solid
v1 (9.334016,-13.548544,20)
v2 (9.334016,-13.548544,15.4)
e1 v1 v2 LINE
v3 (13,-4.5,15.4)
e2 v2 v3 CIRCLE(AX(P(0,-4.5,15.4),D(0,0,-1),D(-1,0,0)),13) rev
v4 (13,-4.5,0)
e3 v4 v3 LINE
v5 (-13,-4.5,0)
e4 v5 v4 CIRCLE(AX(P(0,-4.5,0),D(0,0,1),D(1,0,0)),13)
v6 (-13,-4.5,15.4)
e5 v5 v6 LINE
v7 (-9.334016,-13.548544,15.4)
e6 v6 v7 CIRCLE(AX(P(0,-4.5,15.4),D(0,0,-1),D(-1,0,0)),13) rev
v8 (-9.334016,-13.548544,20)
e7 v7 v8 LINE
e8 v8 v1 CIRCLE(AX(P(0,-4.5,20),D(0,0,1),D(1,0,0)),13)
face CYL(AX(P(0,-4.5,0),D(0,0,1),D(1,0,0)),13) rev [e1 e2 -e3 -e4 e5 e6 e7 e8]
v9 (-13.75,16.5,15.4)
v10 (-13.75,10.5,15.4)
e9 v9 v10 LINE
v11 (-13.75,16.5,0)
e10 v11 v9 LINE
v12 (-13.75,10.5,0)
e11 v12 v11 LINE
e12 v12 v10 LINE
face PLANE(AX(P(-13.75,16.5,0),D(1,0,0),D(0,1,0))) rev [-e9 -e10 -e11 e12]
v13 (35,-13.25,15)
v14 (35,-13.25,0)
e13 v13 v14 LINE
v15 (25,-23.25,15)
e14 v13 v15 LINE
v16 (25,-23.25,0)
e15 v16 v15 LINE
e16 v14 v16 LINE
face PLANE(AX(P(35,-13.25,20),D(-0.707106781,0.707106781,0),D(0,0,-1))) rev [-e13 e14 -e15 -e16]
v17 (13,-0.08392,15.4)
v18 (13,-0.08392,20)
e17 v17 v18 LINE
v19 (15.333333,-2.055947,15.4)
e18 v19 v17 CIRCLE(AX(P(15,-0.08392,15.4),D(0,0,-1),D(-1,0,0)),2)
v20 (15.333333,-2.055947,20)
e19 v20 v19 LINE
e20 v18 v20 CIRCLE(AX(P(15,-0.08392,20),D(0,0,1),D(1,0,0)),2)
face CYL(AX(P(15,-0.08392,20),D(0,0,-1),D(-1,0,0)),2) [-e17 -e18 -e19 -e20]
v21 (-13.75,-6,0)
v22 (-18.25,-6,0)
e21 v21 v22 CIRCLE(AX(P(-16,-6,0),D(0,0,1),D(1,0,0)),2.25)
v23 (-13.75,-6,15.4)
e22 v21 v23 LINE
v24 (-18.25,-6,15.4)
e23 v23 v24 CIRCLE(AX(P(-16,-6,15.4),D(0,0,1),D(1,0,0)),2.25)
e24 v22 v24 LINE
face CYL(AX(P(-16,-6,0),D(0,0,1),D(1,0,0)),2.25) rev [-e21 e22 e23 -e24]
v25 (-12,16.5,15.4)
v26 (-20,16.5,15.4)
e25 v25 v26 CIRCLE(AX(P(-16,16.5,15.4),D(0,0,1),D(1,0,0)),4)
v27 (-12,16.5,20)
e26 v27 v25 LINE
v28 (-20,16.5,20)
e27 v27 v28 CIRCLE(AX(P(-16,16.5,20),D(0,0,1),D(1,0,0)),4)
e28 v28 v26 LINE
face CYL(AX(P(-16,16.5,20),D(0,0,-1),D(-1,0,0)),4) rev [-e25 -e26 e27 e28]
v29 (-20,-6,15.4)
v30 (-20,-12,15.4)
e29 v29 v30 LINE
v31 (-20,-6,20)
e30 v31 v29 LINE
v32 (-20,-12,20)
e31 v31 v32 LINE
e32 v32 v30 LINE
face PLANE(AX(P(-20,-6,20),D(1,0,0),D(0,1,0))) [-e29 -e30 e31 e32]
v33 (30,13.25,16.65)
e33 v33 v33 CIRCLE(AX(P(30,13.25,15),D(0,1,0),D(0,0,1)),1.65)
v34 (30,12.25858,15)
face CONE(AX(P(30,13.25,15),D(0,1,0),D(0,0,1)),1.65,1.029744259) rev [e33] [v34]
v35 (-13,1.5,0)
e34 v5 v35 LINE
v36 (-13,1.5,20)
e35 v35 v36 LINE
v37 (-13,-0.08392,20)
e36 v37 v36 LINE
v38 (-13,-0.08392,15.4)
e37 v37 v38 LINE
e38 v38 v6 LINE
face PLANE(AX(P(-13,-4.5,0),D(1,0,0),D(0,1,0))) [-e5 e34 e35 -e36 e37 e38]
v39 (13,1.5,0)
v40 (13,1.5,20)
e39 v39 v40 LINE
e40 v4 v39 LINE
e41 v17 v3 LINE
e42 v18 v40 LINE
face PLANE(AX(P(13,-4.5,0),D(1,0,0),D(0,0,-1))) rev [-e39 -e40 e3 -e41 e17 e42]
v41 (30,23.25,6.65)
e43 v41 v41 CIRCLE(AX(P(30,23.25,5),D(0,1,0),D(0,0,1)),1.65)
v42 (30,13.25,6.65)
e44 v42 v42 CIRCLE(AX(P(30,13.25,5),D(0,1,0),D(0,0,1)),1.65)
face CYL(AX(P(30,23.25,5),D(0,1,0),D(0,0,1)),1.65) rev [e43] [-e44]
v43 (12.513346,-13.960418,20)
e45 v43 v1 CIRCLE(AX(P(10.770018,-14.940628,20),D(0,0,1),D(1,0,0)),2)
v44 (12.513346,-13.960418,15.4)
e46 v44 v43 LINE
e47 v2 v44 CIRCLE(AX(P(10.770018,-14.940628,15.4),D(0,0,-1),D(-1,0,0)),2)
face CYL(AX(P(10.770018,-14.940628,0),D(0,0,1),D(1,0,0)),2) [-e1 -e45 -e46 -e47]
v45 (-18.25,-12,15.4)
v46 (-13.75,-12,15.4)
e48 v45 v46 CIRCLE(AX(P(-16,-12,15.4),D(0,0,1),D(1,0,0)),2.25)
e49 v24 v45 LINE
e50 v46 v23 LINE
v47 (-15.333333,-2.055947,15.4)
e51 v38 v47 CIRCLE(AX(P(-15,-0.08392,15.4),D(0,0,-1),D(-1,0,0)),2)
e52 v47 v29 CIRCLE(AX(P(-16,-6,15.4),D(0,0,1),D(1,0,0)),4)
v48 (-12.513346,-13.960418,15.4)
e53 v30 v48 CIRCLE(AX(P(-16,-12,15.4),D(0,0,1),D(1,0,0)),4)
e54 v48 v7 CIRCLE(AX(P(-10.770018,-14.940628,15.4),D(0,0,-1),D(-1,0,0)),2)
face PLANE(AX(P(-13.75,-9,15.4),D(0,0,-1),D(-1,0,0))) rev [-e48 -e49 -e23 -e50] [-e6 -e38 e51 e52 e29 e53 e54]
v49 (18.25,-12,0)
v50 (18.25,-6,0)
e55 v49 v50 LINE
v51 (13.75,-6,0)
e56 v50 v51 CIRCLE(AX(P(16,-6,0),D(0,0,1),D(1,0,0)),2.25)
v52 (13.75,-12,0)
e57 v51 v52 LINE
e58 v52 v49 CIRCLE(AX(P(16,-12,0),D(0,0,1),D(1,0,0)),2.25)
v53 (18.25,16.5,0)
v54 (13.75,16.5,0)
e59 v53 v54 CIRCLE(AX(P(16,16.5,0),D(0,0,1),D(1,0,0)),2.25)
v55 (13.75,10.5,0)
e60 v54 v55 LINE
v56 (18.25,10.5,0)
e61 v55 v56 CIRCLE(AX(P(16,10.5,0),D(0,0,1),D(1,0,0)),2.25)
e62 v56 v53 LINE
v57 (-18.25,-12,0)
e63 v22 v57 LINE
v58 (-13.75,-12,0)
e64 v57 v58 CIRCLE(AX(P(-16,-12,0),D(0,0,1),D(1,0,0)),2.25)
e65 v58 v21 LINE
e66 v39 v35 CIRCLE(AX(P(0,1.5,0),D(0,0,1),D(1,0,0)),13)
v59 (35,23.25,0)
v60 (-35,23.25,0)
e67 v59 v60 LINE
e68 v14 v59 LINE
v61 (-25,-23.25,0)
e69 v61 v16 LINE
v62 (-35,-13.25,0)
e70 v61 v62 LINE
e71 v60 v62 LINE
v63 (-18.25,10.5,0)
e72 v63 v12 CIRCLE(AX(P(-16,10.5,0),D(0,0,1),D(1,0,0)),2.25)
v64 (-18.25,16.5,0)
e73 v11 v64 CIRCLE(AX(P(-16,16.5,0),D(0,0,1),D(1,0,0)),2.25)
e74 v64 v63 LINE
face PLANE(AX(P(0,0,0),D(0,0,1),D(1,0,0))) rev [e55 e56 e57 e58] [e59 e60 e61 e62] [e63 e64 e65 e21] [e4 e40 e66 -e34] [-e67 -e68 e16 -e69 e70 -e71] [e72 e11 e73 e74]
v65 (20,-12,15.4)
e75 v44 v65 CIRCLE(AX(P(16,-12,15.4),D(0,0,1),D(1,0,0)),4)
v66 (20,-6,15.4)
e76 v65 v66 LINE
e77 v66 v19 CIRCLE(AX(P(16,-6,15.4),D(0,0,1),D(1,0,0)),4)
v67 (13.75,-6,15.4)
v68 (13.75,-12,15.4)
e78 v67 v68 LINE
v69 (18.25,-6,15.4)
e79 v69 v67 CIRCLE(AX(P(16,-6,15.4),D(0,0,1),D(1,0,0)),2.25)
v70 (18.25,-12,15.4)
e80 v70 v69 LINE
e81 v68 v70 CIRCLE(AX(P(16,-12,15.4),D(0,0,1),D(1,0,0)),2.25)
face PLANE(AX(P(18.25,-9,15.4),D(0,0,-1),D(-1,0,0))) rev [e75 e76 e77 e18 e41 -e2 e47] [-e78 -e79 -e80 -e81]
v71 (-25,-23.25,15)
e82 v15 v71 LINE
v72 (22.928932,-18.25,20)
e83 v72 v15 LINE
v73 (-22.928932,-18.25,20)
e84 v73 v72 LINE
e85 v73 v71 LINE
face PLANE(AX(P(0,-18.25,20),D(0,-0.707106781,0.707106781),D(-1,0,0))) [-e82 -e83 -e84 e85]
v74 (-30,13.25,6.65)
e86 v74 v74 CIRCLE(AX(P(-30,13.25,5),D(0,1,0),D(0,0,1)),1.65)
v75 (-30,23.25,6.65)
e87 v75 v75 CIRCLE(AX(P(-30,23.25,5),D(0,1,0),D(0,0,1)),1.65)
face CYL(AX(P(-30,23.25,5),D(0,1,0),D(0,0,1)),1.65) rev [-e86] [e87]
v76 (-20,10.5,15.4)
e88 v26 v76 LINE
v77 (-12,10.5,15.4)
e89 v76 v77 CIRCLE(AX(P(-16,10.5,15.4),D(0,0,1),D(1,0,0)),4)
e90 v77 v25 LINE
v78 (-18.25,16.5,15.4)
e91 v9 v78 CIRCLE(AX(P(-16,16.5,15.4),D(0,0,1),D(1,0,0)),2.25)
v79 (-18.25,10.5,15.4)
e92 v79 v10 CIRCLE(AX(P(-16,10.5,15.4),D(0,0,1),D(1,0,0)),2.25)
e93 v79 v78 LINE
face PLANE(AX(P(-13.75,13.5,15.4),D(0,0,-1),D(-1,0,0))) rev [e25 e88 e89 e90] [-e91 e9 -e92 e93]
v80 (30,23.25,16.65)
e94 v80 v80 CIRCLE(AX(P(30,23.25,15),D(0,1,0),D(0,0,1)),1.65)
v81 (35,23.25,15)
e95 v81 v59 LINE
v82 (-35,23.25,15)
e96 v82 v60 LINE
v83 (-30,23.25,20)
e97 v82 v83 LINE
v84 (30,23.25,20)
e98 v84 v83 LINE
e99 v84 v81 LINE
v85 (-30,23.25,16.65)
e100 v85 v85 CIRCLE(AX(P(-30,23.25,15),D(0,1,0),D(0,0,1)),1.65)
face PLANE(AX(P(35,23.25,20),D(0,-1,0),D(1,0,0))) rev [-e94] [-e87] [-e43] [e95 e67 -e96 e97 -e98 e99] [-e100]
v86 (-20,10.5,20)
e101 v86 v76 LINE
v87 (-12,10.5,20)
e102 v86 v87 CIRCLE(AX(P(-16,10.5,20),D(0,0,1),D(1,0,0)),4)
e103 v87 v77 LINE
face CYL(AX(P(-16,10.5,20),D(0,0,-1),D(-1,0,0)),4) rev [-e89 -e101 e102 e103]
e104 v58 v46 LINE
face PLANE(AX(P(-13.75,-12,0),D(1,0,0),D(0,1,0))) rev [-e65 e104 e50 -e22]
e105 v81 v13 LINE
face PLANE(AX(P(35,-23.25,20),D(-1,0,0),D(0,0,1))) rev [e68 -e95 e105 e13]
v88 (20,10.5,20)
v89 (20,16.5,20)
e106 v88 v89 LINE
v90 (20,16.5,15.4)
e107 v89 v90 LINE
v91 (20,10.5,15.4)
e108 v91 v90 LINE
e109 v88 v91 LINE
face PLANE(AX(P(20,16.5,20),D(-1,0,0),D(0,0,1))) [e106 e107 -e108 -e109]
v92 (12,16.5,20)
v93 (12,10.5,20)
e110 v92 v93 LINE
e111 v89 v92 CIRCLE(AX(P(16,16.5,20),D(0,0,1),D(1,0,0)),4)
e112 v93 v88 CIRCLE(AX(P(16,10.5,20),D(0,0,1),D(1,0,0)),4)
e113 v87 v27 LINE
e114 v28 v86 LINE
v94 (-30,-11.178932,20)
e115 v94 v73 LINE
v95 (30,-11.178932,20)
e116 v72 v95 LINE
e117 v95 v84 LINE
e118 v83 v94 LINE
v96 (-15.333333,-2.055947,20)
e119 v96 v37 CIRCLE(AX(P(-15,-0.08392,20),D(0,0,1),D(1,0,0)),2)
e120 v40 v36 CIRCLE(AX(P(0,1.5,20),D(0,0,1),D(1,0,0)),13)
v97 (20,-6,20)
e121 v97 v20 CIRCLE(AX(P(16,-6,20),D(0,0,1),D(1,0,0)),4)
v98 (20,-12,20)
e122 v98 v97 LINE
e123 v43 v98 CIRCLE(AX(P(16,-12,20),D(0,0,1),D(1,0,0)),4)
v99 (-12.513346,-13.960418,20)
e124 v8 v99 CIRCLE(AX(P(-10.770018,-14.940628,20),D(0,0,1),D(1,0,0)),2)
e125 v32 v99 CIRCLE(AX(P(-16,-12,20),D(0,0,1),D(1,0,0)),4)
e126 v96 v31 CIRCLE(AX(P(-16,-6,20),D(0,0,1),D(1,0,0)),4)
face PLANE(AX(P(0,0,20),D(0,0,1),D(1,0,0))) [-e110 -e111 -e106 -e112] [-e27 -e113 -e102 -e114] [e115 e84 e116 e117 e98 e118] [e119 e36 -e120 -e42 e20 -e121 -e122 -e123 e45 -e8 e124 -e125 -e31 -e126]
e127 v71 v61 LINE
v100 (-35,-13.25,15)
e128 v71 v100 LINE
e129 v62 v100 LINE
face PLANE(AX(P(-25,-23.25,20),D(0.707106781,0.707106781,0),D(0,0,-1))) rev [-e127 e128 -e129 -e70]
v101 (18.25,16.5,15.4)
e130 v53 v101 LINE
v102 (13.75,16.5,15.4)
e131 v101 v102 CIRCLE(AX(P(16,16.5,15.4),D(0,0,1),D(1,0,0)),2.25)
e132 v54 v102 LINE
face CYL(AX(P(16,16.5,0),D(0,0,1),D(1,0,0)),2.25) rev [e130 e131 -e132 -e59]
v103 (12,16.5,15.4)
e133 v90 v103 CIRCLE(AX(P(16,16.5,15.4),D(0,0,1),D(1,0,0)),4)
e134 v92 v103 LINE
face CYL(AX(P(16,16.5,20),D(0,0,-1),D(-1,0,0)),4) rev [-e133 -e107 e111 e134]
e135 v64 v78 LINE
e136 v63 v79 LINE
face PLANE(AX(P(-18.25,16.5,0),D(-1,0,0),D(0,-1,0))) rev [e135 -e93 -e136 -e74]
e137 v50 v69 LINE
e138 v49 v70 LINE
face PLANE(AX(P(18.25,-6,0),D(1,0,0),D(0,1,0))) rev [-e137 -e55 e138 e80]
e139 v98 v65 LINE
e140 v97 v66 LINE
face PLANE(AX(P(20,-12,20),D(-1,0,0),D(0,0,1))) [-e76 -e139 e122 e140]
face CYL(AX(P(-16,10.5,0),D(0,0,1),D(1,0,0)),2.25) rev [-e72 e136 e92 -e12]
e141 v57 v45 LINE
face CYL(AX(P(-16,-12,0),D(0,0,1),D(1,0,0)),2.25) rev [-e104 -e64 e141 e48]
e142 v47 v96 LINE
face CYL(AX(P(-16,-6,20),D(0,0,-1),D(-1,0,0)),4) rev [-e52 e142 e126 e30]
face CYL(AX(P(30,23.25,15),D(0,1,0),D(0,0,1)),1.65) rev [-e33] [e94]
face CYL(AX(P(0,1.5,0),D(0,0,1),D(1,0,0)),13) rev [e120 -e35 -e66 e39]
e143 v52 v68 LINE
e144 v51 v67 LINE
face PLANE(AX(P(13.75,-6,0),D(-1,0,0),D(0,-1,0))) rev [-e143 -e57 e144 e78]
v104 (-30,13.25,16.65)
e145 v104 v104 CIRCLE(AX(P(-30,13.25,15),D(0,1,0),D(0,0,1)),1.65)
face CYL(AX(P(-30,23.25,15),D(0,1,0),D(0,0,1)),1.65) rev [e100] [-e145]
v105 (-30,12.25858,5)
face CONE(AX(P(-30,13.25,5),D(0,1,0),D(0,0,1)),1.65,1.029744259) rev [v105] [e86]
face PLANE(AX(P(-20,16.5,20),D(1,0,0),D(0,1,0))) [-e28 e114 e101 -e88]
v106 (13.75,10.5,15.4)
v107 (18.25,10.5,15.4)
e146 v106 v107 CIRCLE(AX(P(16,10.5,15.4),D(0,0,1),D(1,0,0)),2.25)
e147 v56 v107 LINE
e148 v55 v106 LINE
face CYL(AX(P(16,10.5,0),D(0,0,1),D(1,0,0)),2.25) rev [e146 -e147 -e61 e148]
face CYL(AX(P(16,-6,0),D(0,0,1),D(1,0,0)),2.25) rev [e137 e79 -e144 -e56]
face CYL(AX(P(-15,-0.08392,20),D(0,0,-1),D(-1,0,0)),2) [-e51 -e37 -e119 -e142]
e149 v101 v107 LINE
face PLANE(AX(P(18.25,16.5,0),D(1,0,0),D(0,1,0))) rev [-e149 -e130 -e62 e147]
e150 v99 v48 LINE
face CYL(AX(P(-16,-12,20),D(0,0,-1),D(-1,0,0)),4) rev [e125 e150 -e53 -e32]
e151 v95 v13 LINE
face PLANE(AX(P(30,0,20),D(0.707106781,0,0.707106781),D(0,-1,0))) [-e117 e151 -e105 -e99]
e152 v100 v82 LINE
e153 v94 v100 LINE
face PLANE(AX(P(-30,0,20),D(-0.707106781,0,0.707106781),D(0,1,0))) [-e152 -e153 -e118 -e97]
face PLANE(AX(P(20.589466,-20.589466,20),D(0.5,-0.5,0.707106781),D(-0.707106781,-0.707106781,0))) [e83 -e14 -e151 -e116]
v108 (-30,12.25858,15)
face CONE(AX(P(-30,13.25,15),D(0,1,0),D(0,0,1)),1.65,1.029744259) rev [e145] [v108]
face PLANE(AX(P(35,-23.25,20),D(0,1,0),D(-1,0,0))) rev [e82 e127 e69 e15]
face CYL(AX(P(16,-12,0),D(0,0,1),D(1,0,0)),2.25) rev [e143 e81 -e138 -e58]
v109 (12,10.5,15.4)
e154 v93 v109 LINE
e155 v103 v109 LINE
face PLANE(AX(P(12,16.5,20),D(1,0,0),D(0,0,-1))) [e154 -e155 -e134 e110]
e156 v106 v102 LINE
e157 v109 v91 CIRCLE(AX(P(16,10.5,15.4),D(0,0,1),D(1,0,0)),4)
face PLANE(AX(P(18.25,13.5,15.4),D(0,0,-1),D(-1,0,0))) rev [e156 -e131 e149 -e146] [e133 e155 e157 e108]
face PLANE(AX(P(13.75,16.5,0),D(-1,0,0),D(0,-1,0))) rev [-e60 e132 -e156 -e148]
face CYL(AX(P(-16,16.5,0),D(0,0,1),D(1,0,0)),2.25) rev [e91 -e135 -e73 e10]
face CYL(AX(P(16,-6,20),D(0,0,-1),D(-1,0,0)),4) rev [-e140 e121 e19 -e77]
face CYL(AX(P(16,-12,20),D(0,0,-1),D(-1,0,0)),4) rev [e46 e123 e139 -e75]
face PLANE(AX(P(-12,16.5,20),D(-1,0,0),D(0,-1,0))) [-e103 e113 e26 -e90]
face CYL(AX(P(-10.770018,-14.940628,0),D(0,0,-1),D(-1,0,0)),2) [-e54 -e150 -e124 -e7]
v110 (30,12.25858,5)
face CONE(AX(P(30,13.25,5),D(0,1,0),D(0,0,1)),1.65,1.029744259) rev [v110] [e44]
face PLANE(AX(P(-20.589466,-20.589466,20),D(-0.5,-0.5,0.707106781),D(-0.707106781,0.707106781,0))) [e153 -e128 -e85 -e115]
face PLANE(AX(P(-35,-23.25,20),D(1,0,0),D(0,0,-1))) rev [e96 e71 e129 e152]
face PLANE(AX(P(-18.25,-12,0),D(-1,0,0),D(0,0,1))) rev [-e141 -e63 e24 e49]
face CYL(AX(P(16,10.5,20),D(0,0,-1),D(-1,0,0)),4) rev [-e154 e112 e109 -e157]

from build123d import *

# Parameters (mm, degrees)
SKETCH1_W                                            = 70
SKETCH1_H                                            = 46.5
BOSS_EXTRUDE1_DEPTH                                  = 20
CUT_EXTRUDE1_DEPTH                                   = 47.535604648
CBORE_FOR_M4_HEXAGON_SOCKET_HEAD_CAP_SCR_D           = 4.5
CBORE_FOR_M4_HEXAGON_SOCKET_HEAD_CAP_SCR_CBORE_D     = 8
CBORE_FOR_M4_HEXAGON_SOCKET_HEAD_CAP_SCR_CBORE_DEPTH = 4.6
CUT_EXTRUDE2_DEPTH                                   = 45.751787674
CUT_EXTRUDE3_DEPTH                                   = 45.751787674
FILLET1_R                                            = 2
CHAMFER1_SIZE                                        = 10
M4_TAPPED_HOLE1_D                                    = 3.3
M4_TAPPED_HOLE1_DEPTH                                = 10
M4_TAPPED_HOLE1_TIP                                  = 0.991420021
CHAMFER2_SIZE                                        = 5


with BuildPart() as part:
    # Sketch1 → Boss-Extrude1 (new body)
    with BuildSketch(Plane.XY):
        Rectangle(SKETCH1_W, SKETCH1_H)
    extrude(amount=BOSS_EXTRUDE1_DEPTH)

    # Sketch2 → Cut-Extrude1 (cut, through all)
    with BuildSketch(Plane.XY.offset(20)):
        with BuildLine():
            Line((-13, -4.5), (-13, 1.5))
            ThreePointArc((-13, 1.5), (0, 14.5), (13, 1.5))
            Line((13, 1.5), (13, -4.5))
            ThreePointArc((13, -4.5), (0, -17.5), (-13, -4.5))
        make_face()
    extrude(amount=-CUT_EXTRUDE1_DEPTH, mode=Mode.SUBTRACT)

    # CBORE for M4 Hexagon socket head cap screws1 (through all)
    with Locations(Plane.XY.offset(20)):
        with Locations((-16, 13.5), (-16, -9), (16, -9), (16, 13.5), (0, -1.5)):
            CounterBoreHole(CBORE_FOR_M4_HEXAGON_SOCKET_HEAD_CAP_SCR_D / 2, CBORE_FOR_M4_HEXAGON_SOCKET_HEAD_CAP_SCR_CBORE_D / 2, CBORE_FOR_M4_HEXAGON_SOCKET_HEAD_CAP_SCR_CBORE_DEPTH)

    # Sketch6 → Cut-Extrude2 (cut, through all)
    with BuildSketch(Plane.XY.offset(15.4)):
        with BuildLine():
            Line((-12, 16.5), (-12, 10.5))
            ThreePointArc((-12, 10.5), (-16, 6.5), (-20, 10.5))
            Line((-20, 10.5), (-20, 16.5))
            ThreePointArc((-20, 16.5), (-16, 20.5), (-12, 16.5))
        make_face()
        with BuildLine():
            Line((-12, -6), (-12, -12))
            ThreePointArc((-12, -12), (-16, -16), (-20, -12))
            Line((-20, -12), (-20, -6))
            ThreePointArc((-20, -6), (-16, -2), (-12, -6))
        make_face()
        with BuildLine():
            Line((20, 16.5), (20, 10.5))
            ThreePointArc((20, 10.5), (16, 6.5), (12, 10.5))
            Line((12, 10.5), (12, 16.5))
            ThreePointArc((12, 16.5), (16, 20.5), (20, 16.5))
        make_face()
        with BuildLine():
            Line((12, -12), (12, -6))
            ThreePointArc((12, -6), (16, -2), (20, -6))
            Line((20, -6), (20, -12))
            ThreePointArc((20, -12), (16, -16), (12, -12))
        make_face()
    extrude(amount=CUT_EXTRUDE2_DEPTH, mode=Mode.SUBTRACT)

    # Sketch7 → Cut-Extrude3 (cut, through all)
    with BuildSketch(Plane.XY.offset(15.4)):
        with BuildLine():
            Line((-13.75, 16.5), (-13.75, 10.5))
            ThreePointArc((-13.75, 10.5), (-16, 8.25), (-18.25, 10.5))
            Line((-18.25, 10.5), (-18.25, 16.5))
            ThreePointArc((-18.25, 16.5), (-16, 18.75), (-13.75, 16.5))
        make_face()
        with BuildLine():
            Line((-18.25, -12), (-18.25, -6))
            ThreePointArc((-18.25, -6), (-16, -3.75), (-13.75, -6))
            Line((-13.75, -6), (-13.75, -12))
            ThreePointArc((-13.75, -12), (-16, -14.25), (-18.25, -12))
        make_face()
        with BuildLine():
            Line((18.25, 16.5), (18.25, 10.5))
            ThreePointArc((18.25, 10.5), (16, 8.25), (13.75, 10.5))
            Line((13.75, 10.5), (13.75, 16.5))
            ThreePointArc((13.75, 16.5), (16, 18.75), (18.25, 16.5))
        make_face()
        with BuildLine():
            Line((18.25, -6), (18.25, -12))
            ThreePointArc((18.25, -12), (16, -14.25), (13.75, -12))
            Line((13.75, -12), (13.75, -6))
            ThreePointArc((13.75, -6), (16, -3.75), (18.25, -6))
        make_face()
    extrude(amount=-CUT_EXTRUDE3_DEPTH, mode=Mode.SUBTRACT)

    # Fillet1
    # the kernel refuses this fillet: 2 mm, written as the material it takes off along each edge
    with BuildSketch(Plane(origin=(13, -3.354248689, 28.17582118), x_dir=(0.8738382268582209, 0.48621677601794083, 0), z_dir=(0, 0, -1))) as fillet1_piece_1:
        with BuildLine():
            CenterArc((3.33776502, -1.885304481), FILLET1_R, 109.498154832, 99.594068227)
            Line((1.590088566, -2.857738033), (0, 0))
            ThreePointArc((0, 0), (1.335106008, -0.229391038), (2.670212016, 0))
        make_face()
    extrude(amount=12.77582118, mode=Mode.SUBTRACT)
    with BuildSketch(Plane(origin=(12, -9.5, 15.4), x_dir=(0.11433437649297556, -0.993442323616204, 0), z_dir=(0, 0, 1))) as fillet1_piece_2:
        with BuildLine():
            CenterArc((5.264320611, -1.843966677), FILLET1_R, 112.782223337, 106.542245194)
            Line((3.717181311, -3.111389253), (3.562467381, -3.238131511))
            ThreePointArc((3.562467381, -3.238131511), (1.876525646, -1.534267667), (-0.097526525, -0.174609785))
            Line((-0.097526525, -0.174609785), (0.022866875, 0.198688465))
            ThreePointArc((0.022866875, 0.198688465), (2.506472684, -0.087147477), (4.412415603, 0.184396668))
            Line((4.412415603, 0.184396668), (4.489861512, 0))
        make_face()
    extrude(amount=16.718730334, mode=Mode.SUBTRACT)
    with BuildSketch(Plane(origin=(-12, -9.5, 15.4), x_dir=(0.549971838681665, -0.8351831994581241, 0), z_dir=(0, 0, 1))) as fillet1_piece_3:
        with BuildLine():
            CenterArc((5.220376144, -1.964931936), FILLET1_R, 100.745216059, 106.542245194)
            Line((3.442940977, -2.881842089), (3.265197461, -2.973533104))
            ThreePointArc((3.265197461, -2.973533104), (1.977963631, -1.541966237), (-0.109994368, -0.16703664))
            Line((-0.109994368, -0.16703664), (0.037288401, 0.196493194))
            ThreePointArc((0.037288401, 0.196493194), (2.423746067, -0.027942413), (4.810203733, 0.196493194))
            Line((4.810203733, 0.196493194), (4.847492134, 0))
        make_face()
    extrude(amount=16.718730334, mode=Mode.SUBTRACT)
    with BuildSketch(Plane(origin=(-13, -3.354248689, 28.17582118), x_dir=(-0.8738382268582207, 0.48621677601794133, 0), z_dir=(0, 0, -1))) as fillet1_piece_4:
        with BuildLine():
            CenterArc((3.33776502, 1.885304481), FILLET1_R, 150.907776941, 99.594068227)
            Line((1.590088566, 2.857738033), (0, 0))
            ThreePointArc((0, 0), (1.335106008, 0.229391038), (2.670212016, 0))
        make_face()
    extrude(amount=12.77582118, mode=Mode.SUBTRACT)

    # Chamfer1
    chamfer1_edges = [part.edges().sort_by_distance(p)[0] for p in [
        (35, -23.25, 10),
        (-35, -23.25, 10),
    ]]
    chamfer(chamfer1_edges, length=CHAMFER1_SIZE)

    # M4 Tapped Hole1
    with Locations(Plane(origin=(0, 23.25, 0), x_dir=(1, 0, 0), z_dir=(0, 1, 0))):
        with Locations((-30, -15), (-30, -5), (30, -5), (30, -15)):
            Hole(M4_TAPPED_HOLE1_D / 2, depth=M4_TAPPED_HOLE1_DEPTH)
            with Locations((0, 0, -(M4_TAPPED_HOLE1_DEPTH + M4_TAPPED_HOLE1_TIP / 2))):  # 118° drill point
                Cone(0, M4_TAPPED_HOLE1_D / 2, M4_TAPPED_HOLE1_TIP, mode=Mode.SUBTRACT)

    # Chamfer2
    chamfer2_edges = [part.edges().sort_by_distance(p)[0] for p in [
        (35, 5, 20),
        (0, -23.25, 20),
        (-30, -18.25, 20),
        (30, -18.25, 20),
        (-35, 5, 20),
    ]]
    chamfer(chamfer2_edges, length=CHAMFER2_SIZE)


solid = part.part
